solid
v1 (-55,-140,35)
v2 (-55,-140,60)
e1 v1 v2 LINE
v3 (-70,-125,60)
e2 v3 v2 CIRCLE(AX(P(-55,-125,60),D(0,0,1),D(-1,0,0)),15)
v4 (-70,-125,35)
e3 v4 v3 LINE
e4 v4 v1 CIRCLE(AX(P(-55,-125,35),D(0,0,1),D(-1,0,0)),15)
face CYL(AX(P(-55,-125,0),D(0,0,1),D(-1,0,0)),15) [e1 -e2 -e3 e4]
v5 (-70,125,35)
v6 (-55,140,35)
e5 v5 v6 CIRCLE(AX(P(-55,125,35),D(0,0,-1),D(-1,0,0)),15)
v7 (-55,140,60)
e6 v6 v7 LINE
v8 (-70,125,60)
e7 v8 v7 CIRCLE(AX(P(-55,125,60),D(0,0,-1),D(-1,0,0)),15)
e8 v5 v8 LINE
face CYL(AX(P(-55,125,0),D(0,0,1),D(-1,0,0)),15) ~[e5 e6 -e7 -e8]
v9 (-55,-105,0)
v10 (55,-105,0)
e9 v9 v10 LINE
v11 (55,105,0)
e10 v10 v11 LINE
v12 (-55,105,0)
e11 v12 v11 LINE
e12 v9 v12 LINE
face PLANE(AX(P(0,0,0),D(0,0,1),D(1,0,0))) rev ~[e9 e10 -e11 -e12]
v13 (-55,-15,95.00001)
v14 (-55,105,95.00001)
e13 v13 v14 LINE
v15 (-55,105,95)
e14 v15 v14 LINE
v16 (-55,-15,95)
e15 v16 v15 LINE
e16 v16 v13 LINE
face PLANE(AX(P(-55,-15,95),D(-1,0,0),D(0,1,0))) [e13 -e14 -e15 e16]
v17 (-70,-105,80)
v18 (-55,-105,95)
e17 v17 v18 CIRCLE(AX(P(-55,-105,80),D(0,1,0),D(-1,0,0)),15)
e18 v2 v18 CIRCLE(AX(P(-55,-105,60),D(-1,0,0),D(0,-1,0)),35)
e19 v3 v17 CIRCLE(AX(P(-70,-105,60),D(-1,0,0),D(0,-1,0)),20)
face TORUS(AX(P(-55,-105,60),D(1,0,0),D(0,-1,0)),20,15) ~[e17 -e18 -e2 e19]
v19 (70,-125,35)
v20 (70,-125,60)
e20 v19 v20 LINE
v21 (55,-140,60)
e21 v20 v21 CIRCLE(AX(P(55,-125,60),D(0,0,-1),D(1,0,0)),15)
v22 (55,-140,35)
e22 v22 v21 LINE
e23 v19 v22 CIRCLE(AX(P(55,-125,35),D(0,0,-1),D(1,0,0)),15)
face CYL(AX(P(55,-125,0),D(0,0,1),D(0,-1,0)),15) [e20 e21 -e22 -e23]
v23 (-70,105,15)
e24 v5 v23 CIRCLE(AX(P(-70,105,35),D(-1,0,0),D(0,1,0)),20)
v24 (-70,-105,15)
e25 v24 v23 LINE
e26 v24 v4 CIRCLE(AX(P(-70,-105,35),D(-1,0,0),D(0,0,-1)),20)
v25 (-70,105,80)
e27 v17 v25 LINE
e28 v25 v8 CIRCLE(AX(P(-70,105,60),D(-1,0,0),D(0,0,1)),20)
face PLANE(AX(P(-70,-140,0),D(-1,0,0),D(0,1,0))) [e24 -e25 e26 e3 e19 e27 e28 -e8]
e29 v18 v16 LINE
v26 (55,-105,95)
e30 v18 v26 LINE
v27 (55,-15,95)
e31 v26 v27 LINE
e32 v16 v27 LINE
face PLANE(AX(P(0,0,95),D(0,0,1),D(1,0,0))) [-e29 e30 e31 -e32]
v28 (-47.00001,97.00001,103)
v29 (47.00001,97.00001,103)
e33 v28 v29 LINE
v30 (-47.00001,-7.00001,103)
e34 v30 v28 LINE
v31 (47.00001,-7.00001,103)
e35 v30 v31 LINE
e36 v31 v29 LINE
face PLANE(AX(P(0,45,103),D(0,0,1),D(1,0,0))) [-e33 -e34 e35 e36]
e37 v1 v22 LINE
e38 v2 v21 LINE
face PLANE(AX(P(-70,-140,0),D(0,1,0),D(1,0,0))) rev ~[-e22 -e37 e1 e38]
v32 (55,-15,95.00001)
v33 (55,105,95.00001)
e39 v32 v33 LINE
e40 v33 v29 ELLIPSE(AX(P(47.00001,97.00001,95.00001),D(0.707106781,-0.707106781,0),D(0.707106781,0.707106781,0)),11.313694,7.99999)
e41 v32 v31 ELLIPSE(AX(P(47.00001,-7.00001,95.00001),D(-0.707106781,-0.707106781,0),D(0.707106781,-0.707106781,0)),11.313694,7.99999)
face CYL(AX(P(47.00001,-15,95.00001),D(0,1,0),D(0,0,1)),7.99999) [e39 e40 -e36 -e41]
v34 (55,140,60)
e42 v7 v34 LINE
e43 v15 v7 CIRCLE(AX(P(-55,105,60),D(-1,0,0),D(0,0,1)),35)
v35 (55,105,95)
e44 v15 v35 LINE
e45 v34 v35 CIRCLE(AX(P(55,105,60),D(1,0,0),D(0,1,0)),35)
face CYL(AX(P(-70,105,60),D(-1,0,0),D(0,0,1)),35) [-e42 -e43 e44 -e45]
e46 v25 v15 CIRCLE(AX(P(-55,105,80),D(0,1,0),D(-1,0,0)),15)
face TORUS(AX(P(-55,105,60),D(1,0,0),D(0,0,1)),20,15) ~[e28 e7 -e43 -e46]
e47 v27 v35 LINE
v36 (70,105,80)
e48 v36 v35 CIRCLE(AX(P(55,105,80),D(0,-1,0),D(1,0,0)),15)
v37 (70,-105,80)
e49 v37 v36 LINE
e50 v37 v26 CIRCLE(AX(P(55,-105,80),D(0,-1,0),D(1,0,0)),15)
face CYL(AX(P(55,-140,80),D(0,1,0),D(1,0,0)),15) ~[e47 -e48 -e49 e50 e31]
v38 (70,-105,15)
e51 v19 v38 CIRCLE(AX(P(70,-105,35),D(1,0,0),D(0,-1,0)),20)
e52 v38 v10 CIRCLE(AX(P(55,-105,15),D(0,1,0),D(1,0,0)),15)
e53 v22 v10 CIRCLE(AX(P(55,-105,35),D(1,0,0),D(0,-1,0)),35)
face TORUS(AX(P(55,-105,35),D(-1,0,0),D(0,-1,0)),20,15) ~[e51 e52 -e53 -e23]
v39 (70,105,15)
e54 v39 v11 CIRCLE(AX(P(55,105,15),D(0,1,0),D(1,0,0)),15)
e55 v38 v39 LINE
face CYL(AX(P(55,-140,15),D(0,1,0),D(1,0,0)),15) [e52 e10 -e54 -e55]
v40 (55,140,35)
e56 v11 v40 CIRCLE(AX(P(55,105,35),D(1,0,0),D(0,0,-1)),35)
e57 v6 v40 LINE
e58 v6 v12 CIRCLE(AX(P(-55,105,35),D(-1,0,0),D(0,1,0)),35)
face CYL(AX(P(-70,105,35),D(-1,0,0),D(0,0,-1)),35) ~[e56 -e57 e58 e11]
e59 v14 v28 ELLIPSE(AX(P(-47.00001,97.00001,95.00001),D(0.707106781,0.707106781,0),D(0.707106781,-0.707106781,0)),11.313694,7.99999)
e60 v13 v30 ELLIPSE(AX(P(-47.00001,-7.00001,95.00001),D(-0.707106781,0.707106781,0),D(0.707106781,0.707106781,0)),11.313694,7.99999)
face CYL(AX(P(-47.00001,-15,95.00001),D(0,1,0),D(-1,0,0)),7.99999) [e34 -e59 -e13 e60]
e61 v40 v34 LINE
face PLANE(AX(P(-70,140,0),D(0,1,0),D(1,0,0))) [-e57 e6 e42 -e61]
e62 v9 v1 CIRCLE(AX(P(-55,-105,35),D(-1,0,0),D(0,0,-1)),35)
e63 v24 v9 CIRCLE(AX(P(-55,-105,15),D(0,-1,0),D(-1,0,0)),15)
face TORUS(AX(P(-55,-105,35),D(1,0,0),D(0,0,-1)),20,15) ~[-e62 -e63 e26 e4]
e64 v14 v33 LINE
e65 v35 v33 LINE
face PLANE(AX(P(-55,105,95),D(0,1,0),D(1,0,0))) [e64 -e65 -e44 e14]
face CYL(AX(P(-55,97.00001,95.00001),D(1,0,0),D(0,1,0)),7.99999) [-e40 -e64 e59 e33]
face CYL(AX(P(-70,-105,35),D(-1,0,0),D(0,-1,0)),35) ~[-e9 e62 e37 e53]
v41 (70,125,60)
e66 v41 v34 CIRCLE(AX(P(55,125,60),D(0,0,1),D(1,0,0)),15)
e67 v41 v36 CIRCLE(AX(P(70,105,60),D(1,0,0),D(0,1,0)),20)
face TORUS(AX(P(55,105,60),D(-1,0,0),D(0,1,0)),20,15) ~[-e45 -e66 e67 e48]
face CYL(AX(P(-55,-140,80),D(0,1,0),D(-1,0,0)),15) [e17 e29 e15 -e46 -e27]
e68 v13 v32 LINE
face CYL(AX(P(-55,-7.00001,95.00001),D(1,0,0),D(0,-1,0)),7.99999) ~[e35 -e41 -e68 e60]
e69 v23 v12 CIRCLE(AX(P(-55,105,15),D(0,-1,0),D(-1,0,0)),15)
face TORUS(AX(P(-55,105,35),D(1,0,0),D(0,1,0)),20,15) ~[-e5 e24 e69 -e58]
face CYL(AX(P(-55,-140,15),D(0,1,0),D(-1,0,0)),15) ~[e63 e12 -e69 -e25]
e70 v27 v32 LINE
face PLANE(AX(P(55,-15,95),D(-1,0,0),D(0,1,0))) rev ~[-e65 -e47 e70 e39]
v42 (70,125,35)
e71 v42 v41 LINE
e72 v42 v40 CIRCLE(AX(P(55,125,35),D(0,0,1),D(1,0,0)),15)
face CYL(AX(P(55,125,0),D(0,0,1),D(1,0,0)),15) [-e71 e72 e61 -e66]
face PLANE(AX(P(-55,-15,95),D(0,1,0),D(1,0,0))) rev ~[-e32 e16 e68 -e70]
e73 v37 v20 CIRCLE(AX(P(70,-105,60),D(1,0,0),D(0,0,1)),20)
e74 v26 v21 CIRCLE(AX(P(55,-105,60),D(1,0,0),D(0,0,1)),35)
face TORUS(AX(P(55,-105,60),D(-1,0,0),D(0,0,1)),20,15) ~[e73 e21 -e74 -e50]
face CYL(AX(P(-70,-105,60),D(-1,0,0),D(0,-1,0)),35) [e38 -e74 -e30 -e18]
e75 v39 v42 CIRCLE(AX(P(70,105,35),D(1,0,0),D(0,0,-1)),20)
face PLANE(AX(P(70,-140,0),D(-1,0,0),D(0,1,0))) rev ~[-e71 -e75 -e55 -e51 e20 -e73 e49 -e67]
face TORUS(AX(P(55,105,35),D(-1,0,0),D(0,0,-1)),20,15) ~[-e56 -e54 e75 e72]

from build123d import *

# Parameters (mm, degrees)
F0_W         = 140
F0_H         = 280
F1_DEPTH     = 95
F2_R         = 15
F3_T1_DEPTH  = 140
F3_T4_ANGLE  = 90
F3_T6_ANGLE  = 90
F3_T8_ANGLE  = 90
F3_T10_ANGLE = 90
F3_T12_ANGLE = 90
F3_T14_ANGLE = 90
F3_T16_ANGLE = 90
F3_T18_ANGLE = 90
F4_W         = 110
F4_H         = 120
F5_DEPTH     = 8
F6_R         = 7.99999


# Not quite as in the source:
# - a fillet or chamfer that OpenCascade refuses, or shapes differently, is made with other operations: its cross-section is extruded or revolved along the edge and cut away or added
# - a fillet or chamfer is up to 0.001 mm smaller than in the source, because OpenCascade refuses the exact size


with BuildPart() as f1:
    # F0 (on Top) → F1 (new body)
    with BuildSketch(Plane.XY):
        Rectangle(F0_W, F0_H)
    extrude(amount=F1_DEPTH)

    # F2
    f2_edges = [f1.edges().sort_by_distance(p)[0] for p in [
        (70, -140, 47.5),
        (70, 140, 47.5),
        (70, 0, 0),
        (70, 0, 95),
        (-70, 140, 47.5),
        (-70, -140, 47.5),
        (-70, 0, 0),
        (-70, 0, 95),
    ]]
    fillet(f2_edges, radius=F2_R)

    # F3: fillet of radius 35 on 4 edges, made by hand

    # F3_s2 → F3_t1 (cut)
    with BuildSketch(Plane.YZ.offset(-70)):
        with BuildLine():
            ThreePointArc((-140, 60), (-129.7487373415, 84.7487373415), (-105, 95))
            Line((-105, 95), (-140, 95))
            Line((-140, 95), (-140, 60))
        make_face()
        with BuildLine():
            ThreePointArc((-140, 35), (-129.7487373415, 10.2512626585), (-105, 0))
            Line((-105, 0), (-140, 0))
            Line((-140, 0), (-140, 35))
        make_face()
        with BuildLine():
            ThreePointArc((105, 95), (129.7487373415, 84.7487373415), (140, 60))
            Line((140, 60), (140, 95))
            Line((140, 95), (105, 95))
        make_face()
        with BuildLine():
            ThreePointArc((105, 0), (129.7487373415, 10.2512626585), (140, 35))
            Line((140, 35), (140, 0))
            Line((140, 0), (105, 0))
        make_face()
    extrude(amount=F3_T1_DEPTH, mode=Mode.SUBTRACT)

    # F3_s3 → F3_t4 (revolve, cut)
    with BuildSketch(Plane.XZ.offset(-105)):
        with BuildLine():
            ThreePointArc((70, 15), (65.6066017178, 4.3933982822), (55, 0))
            Line((55, 0), (70, 0))
            Line((70, 0), (70, 15))
        make_face()
    revolve(axis=Axis((70, 105, 35), (1, 0, 0)), revolution_arc=F3_T4_ANGLE, mode=Mode.SUBTRACT)

    # F3_s5 → F3_t6 (revolve, cut)
    with BuildSketch(Plane.XY.offset(35)):
        with BuildLine():
            ThreePointArc((-70, 125), (-65.6066017178, 135.6066017178), (-55, 140))
            Line((-55, 140), (-70, 140))
            Line((-70, 140), (-70, 125))
        make_face()
    revolve(axis=Axis((-70, 105, 35), (-1, 0, 0)), revolution_arc=F3_T6_ANGLE, mode=Mode.SUBTRACT)

    # F3_s7 → F3_t8 (revolve, cut)
    with BuildSketch(Plane.XY.offset(60)):
        with BuildLine():
            ThreePointArc((70, 125), (65.6066017178, 135.6066017178), (55, 140))
            Line((55, 140), (70, 140))
            Line((70, 140), (70, 125))
        make_face()
    revolve(axis=Axis((70, 105, 60), (1, 0, 0)), revolution_arc=F3_T8_ANGLE, mode=Mode.SUBTRACT)

    # F3_s9 → F3_t10 (revolve, cut)
    with BuildSketch(Plane.XZ.offset(-105)):
        with BuildLine():
            ThreePointArc((-70, 80), (-65.6066017178, 90.6066017178), (-55, 95))
            Line((-55, 95), (-70, 95))
            Line((-70, 95), (-70, 80))
        make_face()
    revolve(axis=Axis((-70, 105, 60), (-1, 0, 0)), revolution_arc=F3_T10_ANGLE, mode=Mode.SUBTRACT)

    # F3_s11 → F3_t12 (revolve, cut)
    with BuildSketch(Plane.XZ.offset(105)):
        with BuildLine():
            ThreePointArc((-70, 15), (-65.6066017178, 4.3933982822), (-55, 0))
            Line((-55, 0), (-70, 0))
            Line((-70, 0), (-70, 15))
        make_face()
    revolve(axis=Axis((-70, -105, 35), (-1, 0, 0)), revolution_arc=F3_T12_ANGLE, mode=Mode.SUBTRACT)

    # F3_s13 → F3_t14 (revolve, cut)
    with BuildSketch(Plane.XY.offset(35)):
        with BuildLine():
            ThreePointArc((70, -125), (65.6066017178, -135.6066017178), (55, -140))
            Line((55, -140), (70, -140))
            Line((70, -140), (70, -125))
        make_face()
    revolve(axis=Axis((70, -105, 35), (1, 0, 0)), revolution_arc=F3_T14_ANGLE, mode=Mode.SUBTRACT)

    # F3_s15 → F3_t16 (revolve, cut)
    with BuildSketch(Plane.XY.offset(60)):
        with BuildLine():
            ThreePointArc((-70, -125), (-65.6066017178, -135.6066017178), (-55, -140))
            Line((-55, -140), (-70, -140))
            Line((-70, -140), (-70, -125))
        make_face()
    revolve(axis=Axis((-70, -105, 60), (-1, 0, 0)), revolution_arc=F3_T16_ANGLE, mode=Mode.SUBTRACT)

    # F3_s17 → F3_t18 (revolve, cut)
    with BuildSketch(Plane.XZ.offset(105)):
        with BuildLine():
            ThreePointArc((70, 80), (65.6066017178, 90.6066017178), (55, 95))
            Line((55, 95), (70, 95))
            Line((70, 95), (70, 80))
        make_face()
    revolve(axis=Axis((70, -105, 60), (1, 0, 0)), revolution_arc=F3_T18_ANGLE, mode=Mode.SUBTRACT)

    # F4 (on face) → F5 (join)
    with BuildSketch(Plane.XY.offset(95)):
        with Locations((0, 45)):
            Rectangle(F4_W, F4_H)
    extrude(amount=F5_DEPTH)

    # F6 (radius 8 in the source; OpenCascade refuses exactly that, so slightly less here)
    f6_edges = [f1.edges().sort_by_distance(p)[0] for p in [
        (0, 105, 103),
        (-55, 45, 103),
        (0, -15, 103),
        (55, 45, 103),
    ]]
    fillet(f6_edges, radius=F6_R)


solid = f1.part
